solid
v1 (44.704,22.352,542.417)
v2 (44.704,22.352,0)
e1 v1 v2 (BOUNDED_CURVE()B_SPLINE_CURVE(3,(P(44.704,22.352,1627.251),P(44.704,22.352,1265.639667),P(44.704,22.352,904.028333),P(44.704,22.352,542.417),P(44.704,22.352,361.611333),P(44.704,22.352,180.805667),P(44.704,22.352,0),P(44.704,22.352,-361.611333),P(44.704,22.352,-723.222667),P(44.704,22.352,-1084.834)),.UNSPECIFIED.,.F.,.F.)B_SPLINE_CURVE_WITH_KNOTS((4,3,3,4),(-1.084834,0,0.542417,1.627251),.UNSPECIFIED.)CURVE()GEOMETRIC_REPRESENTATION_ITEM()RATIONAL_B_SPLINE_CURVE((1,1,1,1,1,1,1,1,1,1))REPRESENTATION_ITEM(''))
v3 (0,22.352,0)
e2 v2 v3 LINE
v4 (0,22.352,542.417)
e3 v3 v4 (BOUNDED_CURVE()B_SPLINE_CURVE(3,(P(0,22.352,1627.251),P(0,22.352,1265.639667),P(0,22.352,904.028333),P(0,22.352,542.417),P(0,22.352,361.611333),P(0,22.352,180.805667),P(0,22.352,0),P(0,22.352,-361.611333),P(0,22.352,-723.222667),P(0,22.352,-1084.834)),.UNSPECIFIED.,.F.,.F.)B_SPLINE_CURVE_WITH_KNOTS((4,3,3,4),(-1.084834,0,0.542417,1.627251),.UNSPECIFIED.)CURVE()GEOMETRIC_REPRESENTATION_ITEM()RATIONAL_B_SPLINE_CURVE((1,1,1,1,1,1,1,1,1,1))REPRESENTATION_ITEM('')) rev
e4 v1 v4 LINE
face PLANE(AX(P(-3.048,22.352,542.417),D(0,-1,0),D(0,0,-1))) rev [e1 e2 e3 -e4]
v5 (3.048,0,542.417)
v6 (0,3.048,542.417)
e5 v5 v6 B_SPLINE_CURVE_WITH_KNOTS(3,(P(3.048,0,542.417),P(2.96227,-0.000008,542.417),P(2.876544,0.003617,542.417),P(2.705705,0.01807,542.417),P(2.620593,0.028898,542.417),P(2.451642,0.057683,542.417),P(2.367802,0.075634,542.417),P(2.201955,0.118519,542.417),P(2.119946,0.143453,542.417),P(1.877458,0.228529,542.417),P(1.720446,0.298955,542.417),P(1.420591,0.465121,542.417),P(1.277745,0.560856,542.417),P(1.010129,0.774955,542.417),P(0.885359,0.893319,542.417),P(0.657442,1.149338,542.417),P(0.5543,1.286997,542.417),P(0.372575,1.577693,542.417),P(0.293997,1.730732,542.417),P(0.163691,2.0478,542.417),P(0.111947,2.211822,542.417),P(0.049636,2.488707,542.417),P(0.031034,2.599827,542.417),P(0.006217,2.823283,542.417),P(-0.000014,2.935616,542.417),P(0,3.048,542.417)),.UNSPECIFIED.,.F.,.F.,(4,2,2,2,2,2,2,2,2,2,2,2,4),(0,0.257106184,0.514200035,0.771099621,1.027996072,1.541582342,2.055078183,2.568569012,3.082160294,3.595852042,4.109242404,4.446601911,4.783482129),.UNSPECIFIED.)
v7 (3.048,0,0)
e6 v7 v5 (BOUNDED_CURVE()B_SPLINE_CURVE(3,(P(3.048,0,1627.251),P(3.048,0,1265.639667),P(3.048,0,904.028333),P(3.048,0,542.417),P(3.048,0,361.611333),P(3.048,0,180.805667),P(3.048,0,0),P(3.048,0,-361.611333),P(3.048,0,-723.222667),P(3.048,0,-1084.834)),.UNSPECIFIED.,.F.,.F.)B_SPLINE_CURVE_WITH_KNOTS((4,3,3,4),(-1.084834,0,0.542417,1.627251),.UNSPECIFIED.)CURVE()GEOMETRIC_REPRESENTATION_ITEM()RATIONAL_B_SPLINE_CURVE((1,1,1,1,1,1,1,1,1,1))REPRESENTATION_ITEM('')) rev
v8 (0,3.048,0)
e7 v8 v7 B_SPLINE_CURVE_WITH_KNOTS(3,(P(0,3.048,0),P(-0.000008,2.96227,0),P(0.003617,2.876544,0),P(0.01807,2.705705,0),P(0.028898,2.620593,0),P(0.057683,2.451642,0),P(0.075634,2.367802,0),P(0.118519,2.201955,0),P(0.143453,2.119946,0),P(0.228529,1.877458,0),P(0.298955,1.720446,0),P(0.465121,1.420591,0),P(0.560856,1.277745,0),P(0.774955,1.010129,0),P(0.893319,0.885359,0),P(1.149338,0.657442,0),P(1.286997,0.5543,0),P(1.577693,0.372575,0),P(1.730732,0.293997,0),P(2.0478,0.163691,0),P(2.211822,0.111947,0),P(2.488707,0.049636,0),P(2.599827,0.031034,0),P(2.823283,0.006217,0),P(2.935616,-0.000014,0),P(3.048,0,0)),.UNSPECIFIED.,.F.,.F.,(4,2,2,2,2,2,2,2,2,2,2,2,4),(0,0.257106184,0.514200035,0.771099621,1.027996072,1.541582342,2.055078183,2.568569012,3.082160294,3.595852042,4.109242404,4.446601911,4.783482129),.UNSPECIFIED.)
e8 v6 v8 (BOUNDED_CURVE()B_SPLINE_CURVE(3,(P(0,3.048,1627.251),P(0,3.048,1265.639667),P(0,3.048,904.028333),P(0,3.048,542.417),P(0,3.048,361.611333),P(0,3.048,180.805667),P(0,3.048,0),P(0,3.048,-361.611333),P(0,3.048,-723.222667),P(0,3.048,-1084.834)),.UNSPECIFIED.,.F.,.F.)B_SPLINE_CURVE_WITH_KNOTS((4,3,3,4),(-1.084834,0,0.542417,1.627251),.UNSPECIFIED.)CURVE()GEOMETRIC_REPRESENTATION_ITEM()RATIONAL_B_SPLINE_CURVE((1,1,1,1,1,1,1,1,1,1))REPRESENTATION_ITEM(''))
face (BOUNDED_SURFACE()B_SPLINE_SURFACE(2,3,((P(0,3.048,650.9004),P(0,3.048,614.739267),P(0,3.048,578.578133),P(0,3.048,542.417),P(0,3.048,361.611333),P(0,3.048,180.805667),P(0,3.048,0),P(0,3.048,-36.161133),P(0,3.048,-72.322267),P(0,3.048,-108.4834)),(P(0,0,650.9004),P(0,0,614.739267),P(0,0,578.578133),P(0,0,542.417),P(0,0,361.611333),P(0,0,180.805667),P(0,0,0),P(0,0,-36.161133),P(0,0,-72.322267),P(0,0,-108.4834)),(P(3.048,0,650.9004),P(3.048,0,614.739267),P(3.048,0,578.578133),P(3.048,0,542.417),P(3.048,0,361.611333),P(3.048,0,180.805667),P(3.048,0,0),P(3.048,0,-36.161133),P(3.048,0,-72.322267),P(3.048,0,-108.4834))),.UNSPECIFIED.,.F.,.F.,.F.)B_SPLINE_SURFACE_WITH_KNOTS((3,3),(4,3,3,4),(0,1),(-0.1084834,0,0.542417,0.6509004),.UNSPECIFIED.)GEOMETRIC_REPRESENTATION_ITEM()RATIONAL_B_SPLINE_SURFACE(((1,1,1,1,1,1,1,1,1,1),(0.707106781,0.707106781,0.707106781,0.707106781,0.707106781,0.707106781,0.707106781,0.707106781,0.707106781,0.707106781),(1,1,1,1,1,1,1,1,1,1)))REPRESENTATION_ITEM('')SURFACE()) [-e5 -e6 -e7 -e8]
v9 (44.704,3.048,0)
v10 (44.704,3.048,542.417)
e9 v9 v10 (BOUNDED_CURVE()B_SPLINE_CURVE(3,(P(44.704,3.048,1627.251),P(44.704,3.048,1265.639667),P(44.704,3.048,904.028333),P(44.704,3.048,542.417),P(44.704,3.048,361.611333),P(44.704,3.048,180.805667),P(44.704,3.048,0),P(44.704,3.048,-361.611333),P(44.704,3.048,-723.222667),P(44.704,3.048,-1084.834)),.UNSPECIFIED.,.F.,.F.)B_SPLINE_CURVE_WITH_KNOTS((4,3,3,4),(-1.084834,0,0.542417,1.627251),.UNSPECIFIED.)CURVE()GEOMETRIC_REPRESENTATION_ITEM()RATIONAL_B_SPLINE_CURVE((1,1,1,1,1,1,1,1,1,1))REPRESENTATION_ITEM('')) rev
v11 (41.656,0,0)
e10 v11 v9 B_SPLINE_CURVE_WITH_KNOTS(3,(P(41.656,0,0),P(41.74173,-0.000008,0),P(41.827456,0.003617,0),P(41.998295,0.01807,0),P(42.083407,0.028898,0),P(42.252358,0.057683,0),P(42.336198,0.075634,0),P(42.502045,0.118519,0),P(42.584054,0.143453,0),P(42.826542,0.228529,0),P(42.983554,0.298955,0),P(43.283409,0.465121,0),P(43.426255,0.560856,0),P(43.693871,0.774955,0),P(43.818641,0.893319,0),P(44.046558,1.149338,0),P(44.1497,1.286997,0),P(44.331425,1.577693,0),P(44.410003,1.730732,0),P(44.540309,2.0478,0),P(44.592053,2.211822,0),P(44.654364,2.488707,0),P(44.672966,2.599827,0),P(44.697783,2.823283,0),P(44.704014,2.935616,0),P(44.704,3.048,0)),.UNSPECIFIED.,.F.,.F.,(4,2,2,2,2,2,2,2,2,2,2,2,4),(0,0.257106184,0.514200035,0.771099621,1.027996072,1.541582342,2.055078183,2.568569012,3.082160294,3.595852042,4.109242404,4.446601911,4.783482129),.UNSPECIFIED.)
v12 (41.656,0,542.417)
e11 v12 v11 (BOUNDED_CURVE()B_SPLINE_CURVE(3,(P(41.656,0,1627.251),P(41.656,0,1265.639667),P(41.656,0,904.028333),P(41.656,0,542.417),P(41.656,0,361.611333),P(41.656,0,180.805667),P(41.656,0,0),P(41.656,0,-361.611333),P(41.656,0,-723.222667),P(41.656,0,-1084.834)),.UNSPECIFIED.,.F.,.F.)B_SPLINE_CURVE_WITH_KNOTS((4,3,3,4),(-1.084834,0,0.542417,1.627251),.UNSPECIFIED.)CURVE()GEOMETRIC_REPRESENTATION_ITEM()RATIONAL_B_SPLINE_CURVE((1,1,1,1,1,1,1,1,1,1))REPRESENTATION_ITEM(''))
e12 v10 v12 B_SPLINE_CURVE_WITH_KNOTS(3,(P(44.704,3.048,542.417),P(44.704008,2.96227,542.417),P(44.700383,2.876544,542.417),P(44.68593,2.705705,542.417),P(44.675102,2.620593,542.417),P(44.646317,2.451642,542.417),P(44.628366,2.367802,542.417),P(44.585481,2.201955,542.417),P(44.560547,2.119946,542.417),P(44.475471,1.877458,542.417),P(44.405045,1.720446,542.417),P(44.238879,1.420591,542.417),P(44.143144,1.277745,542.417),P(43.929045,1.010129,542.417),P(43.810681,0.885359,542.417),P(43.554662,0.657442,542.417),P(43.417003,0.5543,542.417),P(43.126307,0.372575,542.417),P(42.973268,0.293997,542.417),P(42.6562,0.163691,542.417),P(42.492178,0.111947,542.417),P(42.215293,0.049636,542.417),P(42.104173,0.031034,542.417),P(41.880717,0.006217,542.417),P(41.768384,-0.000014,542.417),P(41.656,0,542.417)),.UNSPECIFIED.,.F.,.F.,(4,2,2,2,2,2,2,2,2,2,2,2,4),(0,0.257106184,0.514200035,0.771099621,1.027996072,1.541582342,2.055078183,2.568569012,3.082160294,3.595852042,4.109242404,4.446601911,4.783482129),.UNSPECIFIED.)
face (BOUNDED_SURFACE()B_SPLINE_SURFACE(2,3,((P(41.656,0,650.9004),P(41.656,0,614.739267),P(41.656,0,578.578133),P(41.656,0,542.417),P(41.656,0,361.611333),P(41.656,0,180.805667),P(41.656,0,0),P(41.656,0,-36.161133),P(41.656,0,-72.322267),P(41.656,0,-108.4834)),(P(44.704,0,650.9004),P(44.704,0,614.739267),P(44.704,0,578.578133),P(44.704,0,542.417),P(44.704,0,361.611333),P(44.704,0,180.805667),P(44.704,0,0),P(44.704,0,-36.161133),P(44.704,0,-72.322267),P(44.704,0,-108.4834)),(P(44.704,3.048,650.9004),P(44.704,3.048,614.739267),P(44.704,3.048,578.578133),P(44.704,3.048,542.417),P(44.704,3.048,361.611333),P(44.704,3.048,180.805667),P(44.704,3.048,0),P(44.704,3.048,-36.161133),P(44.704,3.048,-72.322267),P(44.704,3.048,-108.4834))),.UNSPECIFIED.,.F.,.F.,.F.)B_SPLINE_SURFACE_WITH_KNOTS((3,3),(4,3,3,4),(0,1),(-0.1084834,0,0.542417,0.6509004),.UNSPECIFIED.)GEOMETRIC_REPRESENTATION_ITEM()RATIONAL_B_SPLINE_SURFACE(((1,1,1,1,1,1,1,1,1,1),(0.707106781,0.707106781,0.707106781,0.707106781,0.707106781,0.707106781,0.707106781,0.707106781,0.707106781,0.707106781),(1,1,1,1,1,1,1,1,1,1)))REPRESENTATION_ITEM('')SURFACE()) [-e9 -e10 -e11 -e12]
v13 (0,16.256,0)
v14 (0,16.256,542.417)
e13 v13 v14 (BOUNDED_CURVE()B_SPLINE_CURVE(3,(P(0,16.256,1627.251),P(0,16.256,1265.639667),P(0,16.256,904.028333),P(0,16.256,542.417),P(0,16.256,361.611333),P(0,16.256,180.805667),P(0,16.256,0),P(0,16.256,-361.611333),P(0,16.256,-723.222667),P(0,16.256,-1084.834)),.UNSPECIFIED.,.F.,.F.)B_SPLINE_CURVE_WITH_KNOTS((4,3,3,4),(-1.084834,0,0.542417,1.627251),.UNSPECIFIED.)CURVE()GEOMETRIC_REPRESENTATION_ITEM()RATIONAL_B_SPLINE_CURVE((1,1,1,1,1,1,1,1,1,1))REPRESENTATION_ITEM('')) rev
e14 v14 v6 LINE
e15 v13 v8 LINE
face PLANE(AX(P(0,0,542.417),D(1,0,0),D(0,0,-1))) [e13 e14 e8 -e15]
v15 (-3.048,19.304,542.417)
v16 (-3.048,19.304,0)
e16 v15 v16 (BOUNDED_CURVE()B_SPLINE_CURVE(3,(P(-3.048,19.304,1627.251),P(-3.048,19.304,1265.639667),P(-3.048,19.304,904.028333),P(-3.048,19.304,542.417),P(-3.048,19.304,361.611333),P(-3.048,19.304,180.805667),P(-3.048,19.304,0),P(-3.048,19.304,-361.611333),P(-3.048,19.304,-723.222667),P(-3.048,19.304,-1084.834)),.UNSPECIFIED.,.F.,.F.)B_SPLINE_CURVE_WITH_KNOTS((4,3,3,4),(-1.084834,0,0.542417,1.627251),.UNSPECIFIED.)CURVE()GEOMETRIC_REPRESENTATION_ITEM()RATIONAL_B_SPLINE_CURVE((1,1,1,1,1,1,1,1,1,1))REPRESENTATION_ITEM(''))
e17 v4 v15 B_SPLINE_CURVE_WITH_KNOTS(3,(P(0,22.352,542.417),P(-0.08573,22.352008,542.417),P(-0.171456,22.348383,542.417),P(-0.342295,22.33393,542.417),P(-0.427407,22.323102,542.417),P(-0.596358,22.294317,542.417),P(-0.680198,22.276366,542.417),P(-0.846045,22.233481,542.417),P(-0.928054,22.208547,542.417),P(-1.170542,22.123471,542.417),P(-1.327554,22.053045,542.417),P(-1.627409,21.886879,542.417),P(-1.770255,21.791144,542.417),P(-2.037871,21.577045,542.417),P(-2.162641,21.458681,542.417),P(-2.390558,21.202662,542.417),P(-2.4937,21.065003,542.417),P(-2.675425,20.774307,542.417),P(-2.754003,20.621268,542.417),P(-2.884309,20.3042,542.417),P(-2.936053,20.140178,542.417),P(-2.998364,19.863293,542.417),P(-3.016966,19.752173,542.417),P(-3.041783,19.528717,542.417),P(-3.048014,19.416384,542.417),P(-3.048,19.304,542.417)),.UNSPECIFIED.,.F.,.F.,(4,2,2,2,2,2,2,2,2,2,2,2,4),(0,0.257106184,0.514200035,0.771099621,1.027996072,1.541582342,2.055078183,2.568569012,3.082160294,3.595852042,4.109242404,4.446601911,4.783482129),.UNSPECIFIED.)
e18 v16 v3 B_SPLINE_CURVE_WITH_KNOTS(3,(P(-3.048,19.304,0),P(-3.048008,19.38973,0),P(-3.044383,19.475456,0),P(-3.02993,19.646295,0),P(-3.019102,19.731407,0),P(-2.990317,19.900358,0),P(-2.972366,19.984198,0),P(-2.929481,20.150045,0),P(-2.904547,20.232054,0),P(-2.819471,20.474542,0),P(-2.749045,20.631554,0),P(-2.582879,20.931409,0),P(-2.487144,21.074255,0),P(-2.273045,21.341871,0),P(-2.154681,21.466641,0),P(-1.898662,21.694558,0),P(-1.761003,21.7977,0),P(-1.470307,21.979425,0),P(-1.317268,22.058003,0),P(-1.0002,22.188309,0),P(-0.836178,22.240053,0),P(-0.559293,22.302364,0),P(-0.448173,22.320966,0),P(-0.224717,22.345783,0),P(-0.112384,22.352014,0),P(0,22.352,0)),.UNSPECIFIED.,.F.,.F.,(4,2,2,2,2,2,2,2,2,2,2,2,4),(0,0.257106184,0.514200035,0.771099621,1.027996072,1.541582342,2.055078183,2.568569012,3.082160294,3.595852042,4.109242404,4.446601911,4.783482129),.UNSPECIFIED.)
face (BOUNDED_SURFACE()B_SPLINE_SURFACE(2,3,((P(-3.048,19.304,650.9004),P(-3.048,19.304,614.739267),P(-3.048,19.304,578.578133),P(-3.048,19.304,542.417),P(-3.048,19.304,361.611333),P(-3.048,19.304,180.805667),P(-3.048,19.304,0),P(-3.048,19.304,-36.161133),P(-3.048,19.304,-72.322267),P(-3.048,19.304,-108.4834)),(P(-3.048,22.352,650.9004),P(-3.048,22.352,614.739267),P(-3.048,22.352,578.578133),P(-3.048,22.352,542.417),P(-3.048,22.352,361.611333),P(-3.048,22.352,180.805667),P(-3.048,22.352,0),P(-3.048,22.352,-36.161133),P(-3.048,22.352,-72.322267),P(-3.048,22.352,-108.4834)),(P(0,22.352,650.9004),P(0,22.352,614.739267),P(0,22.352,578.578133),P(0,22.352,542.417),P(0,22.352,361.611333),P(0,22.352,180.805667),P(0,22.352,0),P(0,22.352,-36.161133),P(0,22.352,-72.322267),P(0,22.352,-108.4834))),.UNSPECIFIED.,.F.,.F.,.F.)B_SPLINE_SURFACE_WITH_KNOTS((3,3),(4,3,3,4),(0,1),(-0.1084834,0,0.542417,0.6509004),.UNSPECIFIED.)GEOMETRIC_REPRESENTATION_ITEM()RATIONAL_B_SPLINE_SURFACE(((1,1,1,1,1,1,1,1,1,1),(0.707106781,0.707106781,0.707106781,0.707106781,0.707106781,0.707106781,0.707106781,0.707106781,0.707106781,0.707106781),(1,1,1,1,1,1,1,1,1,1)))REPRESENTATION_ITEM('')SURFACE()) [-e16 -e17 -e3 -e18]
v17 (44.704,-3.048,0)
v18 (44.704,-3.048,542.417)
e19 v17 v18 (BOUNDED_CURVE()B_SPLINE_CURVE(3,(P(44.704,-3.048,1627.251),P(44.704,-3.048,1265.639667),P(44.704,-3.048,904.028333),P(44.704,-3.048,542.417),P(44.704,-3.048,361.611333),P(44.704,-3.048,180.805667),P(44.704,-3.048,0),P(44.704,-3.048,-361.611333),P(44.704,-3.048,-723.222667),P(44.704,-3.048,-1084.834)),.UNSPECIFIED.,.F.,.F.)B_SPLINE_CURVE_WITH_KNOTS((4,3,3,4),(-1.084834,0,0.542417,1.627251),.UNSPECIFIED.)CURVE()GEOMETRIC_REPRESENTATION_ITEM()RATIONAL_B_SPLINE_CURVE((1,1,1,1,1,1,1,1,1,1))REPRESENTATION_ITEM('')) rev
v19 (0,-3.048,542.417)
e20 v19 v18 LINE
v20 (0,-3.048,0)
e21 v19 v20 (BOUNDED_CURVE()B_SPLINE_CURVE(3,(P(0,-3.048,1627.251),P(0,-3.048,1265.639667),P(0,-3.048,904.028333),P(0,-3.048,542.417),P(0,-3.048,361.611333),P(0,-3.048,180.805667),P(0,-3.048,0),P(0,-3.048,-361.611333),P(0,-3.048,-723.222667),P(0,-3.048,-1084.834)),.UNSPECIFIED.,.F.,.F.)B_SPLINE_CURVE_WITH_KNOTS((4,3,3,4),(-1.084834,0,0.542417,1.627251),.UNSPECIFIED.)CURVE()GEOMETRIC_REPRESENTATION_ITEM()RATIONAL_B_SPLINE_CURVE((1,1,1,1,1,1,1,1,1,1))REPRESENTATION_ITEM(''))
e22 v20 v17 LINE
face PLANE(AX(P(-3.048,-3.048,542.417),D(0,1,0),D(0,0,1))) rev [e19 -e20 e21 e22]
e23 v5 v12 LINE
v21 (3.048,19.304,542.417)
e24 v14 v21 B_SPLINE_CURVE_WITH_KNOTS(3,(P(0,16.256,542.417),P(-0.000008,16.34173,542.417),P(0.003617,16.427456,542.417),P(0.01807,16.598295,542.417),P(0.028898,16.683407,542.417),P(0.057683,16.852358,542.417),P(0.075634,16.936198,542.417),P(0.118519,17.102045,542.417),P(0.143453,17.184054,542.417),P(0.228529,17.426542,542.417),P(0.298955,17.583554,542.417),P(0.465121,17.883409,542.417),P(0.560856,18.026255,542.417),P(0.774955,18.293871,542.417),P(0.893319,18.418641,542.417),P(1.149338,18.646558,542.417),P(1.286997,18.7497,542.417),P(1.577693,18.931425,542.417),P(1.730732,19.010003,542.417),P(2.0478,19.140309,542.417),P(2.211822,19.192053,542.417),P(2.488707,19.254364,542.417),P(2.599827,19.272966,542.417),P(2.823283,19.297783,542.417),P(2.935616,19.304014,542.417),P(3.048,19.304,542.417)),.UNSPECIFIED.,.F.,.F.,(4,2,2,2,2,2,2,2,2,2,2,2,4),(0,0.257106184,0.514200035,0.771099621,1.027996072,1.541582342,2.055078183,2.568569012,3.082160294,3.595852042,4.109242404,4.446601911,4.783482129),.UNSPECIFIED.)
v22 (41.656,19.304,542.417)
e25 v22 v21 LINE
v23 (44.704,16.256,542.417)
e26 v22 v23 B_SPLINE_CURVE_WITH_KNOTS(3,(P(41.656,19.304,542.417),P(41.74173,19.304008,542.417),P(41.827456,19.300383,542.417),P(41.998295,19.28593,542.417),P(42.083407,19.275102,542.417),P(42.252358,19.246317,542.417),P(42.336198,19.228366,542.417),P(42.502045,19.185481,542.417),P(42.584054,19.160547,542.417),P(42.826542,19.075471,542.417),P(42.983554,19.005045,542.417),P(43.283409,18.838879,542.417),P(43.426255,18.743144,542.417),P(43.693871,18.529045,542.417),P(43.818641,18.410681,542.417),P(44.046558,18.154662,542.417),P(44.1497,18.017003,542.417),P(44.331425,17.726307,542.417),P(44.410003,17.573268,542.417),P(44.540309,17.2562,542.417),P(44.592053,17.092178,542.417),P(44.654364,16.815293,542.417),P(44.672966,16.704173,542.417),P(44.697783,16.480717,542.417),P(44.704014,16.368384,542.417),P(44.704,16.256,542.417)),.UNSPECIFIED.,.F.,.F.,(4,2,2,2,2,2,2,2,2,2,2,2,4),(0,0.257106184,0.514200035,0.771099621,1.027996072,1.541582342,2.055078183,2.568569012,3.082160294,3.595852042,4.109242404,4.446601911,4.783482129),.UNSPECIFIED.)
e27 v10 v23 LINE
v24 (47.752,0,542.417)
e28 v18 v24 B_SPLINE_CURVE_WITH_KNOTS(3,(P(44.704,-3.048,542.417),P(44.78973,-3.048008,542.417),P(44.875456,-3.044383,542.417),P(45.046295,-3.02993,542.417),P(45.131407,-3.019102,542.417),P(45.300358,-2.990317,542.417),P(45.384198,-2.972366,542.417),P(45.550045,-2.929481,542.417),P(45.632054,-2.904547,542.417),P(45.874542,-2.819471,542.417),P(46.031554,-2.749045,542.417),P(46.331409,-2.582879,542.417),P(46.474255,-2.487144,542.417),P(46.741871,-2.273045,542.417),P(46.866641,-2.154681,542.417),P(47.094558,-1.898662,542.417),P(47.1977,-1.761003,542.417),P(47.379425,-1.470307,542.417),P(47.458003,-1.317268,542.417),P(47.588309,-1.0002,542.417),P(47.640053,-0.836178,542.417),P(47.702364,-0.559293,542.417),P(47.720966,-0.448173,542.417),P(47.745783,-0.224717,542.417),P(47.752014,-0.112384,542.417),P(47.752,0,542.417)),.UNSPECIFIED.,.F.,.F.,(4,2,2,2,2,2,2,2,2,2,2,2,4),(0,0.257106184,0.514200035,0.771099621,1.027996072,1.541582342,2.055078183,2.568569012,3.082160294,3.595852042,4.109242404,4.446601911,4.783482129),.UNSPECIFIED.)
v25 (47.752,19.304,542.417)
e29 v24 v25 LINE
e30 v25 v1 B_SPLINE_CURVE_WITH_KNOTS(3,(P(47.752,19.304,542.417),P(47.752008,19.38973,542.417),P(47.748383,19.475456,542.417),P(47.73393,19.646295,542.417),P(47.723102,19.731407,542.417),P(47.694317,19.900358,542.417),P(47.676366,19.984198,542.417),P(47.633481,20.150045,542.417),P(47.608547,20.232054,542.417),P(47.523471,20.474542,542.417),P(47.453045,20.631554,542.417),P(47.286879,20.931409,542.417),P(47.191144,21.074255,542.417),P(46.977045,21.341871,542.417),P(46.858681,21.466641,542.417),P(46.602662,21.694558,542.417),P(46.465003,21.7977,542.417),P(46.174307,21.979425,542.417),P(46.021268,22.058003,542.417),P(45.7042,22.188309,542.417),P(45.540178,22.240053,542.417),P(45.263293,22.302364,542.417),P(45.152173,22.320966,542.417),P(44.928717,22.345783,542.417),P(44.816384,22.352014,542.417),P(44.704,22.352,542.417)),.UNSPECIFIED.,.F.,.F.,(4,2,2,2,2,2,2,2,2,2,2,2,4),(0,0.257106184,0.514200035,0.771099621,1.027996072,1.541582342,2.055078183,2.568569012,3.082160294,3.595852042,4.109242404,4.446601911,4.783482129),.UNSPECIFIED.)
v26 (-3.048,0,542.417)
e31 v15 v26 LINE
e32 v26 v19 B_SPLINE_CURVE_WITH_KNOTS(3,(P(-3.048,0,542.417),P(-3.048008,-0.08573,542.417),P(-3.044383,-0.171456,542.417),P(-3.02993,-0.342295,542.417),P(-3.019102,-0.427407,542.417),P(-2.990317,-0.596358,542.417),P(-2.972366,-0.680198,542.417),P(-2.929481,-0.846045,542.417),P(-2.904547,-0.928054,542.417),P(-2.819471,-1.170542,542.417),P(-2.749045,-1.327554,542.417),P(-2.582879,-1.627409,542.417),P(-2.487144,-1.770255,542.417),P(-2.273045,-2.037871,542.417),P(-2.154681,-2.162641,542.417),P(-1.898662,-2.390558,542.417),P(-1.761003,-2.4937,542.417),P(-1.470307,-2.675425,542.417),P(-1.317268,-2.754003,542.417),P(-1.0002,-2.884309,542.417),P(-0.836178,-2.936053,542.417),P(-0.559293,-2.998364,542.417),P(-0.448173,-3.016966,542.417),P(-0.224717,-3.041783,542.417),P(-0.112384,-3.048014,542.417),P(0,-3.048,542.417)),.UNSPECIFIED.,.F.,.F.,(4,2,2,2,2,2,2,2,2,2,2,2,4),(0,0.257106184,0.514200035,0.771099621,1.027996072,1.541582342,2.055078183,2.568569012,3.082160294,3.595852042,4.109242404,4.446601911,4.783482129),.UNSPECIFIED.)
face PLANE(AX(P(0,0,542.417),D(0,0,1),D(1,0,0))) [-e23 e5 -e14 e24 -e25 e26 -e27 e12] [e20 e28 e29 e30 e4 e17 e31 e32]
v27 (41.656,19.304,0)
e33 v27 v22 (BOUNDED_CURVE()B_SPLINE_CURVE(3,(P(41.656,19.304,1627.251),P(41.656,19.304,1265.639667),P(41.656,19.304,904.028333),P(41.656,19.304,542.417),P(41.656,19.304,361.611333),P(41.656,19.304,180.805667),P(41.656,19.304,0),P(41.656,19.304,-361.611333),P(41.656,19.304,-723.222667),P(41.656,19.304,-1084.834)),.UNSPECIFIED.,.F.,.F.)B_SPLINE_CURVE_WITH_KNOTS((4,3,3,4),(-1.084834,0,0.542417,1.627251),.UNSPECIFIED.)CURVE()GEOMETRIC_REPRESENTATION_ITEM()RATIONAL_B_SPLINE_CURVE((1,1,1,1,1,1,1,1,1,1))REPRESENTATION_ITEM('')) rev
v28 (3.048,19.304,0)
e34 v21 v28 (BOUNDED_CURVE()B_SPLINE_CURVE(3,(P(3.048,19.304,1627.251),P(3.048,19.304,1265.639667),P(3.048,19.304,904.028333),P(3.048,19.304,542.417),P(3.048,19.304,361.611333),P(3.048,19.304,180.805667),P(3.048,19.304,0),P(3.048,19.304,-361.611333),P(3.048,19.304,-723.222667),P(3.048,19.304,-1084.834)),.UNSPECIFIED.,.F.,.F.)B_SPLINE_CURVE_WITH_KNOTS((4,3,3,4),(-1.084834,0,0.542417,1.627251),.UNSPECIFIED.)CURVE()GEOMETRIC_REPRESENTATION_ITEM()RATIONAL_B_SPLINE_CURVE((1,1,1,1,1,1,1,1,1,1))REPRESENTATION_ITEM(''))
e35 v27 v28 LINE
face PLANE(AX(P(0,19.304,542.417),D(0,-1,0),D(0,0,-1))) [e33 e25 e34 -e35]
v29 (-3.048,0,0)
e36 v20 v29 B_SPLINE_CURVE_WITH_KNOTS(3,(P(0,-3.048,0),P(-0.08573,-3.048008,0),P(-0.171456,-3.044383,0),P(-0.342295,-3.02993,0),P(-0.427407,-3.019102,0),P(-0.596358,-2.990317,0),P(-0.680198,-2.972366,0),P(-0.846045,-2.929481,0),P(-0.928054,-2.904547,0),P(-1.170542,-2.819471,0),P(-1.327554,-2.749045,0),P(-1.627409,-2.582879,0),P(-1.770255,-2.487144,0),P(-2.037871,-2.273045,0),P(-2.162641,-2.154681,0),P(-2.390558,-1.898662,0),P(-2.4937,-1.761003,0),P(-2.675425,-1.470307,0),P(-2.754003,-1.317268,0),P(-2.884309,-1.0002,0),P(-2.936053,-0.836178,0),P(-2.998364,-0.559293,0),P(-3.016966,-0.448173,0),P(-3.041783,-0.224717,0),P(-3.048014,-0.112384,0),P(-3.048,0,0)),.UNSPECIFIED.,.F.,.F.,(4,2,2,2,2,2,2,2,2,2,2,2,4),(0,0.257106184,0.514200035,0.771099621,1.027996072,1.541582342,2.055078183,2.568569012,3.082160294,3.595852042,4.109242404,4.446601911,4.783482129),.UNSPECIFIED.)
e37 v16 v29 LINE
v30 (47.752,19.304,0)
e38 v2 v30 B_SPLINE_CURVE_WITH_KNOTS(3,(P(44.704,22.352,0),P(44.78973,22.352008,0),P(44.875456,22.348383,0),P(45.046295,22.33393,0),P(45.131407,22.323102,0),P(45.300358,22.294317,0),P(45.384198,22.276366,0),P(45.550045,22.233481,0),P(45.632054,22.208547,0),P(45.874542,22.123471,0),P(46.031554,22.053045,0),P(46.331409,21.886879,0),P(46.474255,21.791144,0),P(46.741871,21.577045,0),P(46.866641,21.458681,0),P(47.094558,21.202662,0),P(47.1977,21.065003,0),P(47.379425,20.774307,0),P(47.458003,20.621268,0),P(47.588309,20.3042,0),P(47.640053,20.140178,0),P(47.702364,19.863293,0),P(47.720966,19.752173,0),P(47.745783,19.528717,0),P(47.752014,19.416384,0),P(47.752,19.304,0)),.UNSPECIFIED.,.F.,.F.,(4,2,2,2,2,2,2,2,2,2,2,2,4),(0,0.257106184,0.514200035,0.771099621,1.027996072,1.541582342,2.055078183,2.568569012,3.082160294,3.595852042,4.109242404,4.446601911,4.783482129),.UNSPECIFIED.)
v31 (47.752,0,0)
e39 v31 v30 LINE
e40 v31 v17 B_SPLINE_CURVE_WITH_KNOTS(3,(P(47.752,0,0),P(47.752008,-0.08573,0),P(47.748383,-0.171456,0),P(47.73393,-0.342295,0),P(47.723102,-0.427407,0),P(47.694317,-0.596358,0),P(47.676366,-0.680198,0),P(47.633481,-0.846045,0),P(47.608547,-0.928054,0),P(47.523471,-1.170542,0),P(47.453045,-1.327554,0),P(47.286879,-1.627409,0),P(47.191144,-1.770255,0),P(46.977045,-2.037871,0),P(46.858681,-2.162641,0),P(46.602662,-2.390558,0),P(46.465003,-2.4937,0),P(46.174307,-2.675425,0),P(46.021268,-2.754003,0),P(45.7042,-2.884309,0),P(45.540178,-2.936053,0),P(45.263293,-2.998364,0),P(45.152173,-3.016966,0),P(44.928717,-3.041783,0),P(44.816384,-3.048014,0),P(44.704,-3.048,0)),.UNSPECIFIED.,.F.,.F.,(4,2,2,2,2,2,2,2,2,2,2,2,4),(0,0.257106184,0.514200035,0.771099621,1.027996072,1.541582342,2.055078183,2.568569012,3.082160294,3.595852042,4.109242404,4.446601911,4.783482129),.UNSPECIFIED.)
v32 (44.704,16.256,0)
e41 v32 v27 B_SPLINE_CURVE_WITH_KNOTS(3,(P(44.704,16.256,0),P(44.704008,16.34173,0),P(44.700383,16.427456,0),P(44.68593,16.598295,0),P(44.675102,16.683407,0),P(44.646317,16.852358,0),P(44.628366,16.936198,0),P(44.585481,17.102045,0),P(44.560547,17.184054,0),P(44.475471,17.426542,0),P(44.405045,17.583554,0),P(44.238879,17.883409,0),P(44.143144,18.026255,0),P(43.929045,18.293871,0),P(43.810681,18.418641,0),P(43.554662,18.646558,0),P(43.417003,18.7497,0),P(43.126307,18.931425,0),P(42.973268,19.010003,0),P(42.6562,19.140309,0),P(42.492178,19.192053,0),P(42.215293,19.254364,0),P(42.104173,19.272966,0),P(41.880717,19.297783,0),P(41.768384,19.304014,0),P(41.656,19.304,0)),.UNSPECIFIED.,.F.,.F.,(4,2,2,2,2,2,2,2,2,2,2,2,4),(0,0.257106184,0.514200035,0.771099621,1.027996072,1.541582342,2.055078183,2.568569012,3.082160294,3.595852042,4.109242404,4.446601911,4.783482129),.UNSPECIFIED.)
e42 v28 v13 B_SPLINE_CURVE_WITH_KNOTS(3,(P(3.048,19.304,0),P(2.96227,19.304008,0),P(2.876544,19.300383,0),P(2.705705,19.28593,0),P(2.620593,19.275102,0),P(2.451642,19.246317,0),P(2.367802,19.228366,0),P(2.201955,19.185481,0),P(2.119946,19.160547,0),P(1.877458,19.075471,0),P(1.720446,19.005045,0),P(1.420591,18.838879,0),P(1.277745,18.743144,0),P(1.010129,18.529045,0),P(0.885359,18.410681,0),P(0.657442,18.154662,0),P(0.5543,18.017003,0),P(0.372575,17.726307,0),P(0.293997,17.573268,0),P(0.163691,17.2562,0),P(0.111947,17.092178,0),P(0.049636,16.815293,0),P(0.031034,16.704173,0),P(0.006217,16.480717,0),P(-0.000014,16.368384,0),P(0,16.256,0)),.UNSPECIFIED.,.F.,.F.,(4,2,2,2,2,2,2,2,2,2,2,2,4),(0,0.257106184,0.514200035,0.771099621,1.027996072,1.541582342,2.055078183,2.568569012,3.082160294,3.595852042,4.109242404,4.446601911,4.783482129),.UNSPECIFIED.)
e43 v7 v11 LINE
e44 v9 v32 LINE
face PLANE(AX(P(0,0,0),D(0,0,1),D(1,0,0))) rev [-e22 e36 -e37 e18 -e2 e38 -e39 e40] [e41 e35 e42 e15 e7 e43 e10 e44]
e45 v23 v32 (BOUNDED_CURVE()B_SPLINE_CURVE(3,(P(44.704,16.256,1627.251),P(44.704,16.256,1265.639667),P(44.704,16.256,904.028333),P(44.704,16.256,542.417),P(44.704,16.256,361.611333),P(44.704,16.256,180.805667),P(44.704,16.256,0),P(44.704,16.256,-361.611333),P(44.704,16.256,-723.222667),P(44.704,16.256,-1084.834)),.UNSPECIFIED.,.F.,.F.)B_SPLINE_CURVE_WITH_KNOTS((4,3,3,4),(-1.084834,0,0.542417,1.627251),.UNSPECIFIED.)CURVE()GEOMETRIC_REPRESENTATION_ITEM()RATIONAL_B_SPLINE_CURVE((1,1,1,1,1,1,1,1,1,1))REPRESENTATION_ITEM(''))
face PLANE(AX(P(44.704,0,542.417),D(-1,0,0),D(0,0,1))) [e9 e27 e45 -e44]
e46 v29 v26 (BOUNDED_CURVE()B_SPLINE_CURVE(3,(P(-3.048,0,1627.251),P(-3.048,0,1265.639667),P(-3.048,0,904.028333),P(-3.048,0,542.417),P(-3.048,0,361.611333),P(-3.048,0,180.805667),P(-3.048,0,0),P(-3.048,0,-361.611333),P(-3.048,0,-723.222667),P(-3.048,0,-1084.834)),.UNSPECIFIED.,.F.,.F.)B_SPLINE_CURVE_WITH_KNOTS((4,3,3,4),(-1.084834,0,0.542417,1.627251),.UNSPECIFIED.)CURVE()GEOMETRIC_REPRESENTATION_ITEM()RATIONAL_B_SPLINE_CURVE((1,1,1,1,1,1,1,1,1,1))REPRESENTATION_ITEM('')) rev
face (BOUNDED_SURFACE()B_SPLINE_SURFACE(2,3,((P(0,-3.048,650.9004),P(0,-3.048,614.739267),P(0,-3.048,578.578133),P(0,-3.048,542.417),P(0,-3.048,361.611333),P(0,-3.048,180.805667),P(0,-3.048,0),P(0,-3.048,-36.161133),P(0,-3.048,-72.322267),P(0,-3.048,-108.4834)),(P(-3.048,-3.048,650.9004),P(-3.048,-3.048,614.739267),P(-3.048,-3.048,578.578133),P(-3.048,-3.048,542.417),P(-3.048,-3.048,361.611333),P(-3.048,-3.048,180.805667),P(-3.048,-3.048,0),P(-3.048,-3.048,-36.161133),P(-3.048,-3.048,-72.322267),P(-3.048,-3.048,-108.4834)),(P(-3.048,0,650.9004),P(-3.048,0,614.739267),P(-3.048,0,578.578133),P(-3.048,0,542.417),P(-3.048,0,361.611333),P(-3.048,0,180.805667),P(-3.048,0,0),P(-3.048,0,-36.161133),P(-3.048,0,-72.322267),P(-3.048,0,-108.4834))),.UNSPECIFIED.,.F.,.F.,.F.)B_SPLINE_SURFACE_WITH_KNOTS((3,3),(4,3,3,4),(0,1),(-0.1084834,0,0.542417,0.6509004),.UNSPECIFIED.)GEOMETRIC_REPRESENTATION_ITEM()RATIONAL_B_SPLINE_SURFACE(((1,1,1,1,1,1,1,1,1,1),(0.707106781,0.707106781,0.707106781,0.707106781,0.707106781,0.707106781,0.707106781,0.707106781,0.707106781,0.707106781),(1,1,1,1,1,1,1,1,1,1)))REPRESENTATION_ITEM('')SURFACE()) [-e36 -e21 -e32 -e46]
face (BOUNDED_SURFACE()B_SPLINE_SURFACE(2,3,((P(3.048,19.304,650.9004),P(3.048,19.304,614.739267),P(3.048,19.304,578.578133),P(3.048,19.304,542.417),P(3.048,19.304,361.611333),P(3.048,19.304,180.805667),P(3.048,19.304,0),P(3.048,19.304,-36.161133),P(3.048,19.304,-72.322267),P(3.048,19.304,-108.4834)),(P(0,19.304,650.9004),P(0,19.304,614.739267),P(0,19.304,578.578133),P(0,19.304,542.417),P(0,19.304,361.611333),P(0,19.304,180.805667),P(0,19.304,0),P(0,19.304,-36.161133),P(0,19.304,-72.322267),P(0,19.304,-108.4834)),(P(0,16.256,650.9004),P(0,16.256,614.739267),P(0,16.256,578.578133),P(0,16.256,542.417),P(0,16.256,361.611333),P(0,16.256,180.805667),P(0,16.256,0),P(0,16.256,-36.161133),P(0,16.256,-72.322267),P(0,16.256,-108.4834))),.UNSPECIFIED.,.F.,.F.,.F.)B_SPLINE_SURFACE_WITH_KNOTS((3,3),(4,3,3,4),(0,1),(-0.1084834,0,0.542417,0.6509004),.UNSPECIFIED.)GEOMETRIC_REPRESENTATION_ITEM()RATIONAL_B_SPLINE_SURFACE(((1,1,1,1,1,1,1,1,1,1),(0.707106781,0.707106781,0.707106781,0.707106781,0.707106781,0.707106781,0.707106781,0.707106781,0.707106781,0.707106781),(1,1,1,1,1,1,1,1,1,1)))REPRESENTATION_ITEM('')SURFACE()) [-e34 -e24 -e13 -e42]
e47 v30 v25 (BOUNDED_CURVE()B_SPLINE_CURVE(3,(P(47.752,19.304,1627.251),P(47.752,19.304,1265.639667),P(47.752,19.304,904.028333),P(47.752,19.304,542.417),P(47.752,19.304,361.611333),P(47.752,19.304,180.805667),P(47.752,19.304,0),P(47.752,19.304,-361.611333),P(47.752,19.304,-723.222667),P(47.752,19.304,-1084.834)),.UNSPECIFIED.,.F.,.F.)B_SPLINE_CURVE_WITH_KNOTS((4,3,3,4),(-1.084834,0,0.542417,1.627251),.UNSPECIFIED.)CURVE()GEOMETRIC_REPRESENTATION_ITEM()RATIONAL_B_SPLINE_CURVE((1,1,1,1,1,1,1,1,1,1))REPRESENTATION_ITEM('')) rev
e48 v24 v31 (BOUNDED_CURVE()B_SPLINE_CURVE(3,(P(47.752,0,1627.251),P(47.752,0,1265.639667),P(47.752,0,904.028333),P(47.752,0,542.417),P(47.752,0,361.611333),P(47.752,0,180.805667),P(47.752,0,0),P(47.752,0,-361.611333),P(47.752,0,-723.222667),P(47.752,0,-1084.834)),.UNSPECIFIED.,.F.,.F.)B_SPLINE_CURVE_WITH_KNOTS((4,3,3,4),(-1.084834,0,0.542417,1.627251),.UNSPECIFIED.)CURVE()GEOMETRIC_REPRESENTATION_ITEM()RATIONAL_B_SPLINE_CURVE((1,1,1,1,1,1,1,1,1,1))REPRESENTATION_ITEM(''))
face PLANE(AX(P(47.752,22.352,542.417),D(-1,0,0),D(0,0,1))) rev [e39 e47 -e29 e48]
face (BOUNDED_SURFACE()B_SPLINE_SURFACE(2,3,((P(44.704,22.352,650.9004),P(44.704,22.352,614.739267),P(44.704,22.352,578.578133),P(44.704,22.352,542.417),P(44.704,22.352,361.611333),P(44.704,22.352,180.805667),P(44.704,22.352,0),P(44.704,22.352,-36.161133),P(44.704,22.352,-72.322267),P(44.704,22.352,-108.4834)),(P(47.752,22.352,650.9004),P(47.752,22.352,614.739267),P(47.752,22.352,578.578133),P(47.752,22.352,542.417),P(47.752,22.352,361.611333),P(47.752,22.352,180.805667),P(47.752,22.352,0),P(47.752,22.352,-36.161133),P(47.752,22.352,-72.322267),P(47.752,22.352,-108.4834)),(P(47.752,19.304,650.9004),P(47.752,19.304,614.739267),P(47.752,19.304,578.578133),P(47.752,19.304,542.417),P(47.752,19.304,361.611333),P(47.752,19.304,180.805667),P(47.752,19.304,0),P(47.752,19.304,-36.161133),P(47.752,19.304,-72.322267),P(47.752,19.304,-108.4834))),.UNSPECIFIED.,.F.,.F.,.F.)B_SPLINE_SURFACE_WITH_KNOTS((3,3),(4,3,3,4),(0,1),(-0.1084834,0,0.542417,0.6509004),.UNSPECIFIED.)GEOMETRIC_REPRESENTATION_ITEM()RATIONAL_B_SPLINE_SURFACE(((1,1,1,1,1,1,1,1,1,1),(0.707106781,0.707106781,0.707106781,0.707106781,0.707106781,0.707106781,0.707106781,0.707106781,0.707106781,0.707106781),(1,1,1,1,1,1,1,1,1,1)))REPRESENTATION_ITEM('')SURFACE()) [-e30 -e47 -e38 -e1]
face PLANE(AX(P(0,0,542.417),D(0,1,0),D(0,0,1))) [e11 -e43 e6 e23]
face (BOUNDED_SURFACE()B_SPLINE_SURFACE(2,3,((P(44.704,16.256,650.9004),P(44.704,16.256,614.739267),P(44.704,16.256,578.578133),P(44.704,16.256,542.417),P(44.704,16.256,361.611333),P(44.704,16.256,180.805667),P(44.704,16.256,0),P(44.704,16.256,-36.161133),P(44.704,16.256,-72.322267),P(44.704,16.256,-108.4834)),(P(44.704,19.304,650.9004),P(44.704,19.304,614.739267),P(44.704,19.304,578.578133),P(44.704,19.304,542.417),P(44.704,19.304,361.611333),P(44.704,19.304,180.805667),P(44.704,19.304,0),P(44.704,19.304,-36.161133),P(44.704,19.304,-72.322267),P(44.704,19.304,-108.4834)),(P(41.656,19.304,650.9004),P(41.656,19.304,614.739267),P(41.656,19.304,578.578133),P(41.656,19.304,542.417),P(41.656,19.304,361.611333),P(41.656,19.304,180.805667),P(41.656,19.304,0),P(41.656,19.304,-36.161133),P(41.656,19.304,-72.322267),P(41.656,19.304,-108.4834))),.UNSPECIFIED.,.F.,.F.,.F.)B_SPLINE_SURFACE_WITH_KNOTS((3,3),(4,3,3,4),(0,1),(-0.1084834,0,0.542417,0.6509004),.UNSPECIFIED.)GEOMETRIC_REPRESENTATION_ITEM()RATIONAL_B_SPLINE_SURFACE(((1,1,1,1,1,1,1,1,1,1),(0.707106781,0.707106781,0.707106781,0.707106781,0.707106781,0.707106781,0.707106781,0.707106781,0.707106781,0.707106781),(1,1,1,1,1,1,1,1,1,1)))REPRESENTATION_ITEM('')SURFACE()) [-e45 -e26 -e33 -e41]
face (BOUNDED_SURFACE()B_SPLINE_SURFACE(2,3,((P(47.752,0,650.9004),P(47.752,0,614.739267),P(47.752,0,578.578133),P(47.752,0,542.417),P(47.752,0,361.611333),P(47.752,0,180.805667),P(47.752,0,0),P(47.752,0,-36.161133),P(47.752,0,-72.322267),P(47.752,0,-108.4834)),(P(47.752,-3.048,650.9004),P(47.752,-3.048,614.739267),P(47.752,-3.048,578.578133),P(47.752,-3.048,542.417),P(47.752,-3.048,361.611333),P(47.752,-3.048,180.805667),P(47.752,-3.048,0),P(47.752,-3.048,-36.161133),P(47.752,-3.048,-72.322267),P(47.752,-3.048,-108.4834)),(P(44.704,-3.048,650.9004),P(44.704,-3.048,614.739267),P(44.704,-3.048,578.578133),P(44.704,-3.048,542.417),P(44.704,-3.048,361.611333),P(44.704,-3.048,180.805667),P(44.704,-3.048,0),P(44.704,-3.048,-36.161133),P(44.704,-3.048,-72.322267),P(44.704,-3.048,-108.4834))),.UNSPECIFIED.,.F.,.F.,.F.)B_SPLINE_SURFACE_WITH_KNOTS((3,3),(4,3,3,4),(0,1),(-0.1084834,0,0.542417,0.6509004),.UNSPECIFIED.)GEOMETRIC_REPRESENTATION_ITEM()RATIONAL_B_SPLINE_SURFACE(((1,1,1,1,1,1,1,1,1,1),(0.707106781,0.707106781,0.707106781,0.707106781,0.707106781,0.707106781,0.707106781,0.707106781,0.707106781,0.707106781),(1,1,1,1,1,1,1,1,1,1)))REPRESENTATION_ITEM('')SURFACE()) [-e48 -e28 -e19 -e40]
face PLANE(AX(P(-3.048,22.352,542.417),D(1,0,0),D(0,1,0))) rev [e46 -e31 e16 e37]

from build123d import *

# Parameters (mm, degrees)
SKETCH1_W           = 50.8
SKETCH1_H           = 25.4
SKETCH1_W_2         = 44.704
SKETCH1_H_2         = 19.304
BOSS_EXTRUDE1_DEPTH = 542.417
VARFILLET1_R        = 3.048


with BuildPart() as part:
    # Sketch1 → Boss-Extrude1 (new body)
    with BuildSketch(Plane.XY):
        with Locations((22.352, 9.652)):
            Rectangle(SKETCH1_W, SKETCH1_H)
        with Locations((22.352, 9.652)):
            Rectangle(SKETCH1_W_2, SKETCH1_H_2, mode=Mode.SUBTRACT)
    extrude(amount=BOSS_EXTRUDE1_DEPTH)

    # VarFillet1
    varfillet1_edges = [part.edges().sort_by_distance(p)[0] for p in [
        (0, 19.304, 271.2085),
        (0, 0, 271.2085),
        (44.704, 19.304, 271.2085),
        (44.704, 0, 271.2085),
        (47.752, -3.048, 271.2085),
        (47.752, 22.352, 271.2085),
        (-3.048, 22.352, 271.2085),
        (-3.048, -3.048, 271.2085),
    ]]
    fillet(varfillet1_edges, radius=VARFILLET1_R)


solid = part.part
